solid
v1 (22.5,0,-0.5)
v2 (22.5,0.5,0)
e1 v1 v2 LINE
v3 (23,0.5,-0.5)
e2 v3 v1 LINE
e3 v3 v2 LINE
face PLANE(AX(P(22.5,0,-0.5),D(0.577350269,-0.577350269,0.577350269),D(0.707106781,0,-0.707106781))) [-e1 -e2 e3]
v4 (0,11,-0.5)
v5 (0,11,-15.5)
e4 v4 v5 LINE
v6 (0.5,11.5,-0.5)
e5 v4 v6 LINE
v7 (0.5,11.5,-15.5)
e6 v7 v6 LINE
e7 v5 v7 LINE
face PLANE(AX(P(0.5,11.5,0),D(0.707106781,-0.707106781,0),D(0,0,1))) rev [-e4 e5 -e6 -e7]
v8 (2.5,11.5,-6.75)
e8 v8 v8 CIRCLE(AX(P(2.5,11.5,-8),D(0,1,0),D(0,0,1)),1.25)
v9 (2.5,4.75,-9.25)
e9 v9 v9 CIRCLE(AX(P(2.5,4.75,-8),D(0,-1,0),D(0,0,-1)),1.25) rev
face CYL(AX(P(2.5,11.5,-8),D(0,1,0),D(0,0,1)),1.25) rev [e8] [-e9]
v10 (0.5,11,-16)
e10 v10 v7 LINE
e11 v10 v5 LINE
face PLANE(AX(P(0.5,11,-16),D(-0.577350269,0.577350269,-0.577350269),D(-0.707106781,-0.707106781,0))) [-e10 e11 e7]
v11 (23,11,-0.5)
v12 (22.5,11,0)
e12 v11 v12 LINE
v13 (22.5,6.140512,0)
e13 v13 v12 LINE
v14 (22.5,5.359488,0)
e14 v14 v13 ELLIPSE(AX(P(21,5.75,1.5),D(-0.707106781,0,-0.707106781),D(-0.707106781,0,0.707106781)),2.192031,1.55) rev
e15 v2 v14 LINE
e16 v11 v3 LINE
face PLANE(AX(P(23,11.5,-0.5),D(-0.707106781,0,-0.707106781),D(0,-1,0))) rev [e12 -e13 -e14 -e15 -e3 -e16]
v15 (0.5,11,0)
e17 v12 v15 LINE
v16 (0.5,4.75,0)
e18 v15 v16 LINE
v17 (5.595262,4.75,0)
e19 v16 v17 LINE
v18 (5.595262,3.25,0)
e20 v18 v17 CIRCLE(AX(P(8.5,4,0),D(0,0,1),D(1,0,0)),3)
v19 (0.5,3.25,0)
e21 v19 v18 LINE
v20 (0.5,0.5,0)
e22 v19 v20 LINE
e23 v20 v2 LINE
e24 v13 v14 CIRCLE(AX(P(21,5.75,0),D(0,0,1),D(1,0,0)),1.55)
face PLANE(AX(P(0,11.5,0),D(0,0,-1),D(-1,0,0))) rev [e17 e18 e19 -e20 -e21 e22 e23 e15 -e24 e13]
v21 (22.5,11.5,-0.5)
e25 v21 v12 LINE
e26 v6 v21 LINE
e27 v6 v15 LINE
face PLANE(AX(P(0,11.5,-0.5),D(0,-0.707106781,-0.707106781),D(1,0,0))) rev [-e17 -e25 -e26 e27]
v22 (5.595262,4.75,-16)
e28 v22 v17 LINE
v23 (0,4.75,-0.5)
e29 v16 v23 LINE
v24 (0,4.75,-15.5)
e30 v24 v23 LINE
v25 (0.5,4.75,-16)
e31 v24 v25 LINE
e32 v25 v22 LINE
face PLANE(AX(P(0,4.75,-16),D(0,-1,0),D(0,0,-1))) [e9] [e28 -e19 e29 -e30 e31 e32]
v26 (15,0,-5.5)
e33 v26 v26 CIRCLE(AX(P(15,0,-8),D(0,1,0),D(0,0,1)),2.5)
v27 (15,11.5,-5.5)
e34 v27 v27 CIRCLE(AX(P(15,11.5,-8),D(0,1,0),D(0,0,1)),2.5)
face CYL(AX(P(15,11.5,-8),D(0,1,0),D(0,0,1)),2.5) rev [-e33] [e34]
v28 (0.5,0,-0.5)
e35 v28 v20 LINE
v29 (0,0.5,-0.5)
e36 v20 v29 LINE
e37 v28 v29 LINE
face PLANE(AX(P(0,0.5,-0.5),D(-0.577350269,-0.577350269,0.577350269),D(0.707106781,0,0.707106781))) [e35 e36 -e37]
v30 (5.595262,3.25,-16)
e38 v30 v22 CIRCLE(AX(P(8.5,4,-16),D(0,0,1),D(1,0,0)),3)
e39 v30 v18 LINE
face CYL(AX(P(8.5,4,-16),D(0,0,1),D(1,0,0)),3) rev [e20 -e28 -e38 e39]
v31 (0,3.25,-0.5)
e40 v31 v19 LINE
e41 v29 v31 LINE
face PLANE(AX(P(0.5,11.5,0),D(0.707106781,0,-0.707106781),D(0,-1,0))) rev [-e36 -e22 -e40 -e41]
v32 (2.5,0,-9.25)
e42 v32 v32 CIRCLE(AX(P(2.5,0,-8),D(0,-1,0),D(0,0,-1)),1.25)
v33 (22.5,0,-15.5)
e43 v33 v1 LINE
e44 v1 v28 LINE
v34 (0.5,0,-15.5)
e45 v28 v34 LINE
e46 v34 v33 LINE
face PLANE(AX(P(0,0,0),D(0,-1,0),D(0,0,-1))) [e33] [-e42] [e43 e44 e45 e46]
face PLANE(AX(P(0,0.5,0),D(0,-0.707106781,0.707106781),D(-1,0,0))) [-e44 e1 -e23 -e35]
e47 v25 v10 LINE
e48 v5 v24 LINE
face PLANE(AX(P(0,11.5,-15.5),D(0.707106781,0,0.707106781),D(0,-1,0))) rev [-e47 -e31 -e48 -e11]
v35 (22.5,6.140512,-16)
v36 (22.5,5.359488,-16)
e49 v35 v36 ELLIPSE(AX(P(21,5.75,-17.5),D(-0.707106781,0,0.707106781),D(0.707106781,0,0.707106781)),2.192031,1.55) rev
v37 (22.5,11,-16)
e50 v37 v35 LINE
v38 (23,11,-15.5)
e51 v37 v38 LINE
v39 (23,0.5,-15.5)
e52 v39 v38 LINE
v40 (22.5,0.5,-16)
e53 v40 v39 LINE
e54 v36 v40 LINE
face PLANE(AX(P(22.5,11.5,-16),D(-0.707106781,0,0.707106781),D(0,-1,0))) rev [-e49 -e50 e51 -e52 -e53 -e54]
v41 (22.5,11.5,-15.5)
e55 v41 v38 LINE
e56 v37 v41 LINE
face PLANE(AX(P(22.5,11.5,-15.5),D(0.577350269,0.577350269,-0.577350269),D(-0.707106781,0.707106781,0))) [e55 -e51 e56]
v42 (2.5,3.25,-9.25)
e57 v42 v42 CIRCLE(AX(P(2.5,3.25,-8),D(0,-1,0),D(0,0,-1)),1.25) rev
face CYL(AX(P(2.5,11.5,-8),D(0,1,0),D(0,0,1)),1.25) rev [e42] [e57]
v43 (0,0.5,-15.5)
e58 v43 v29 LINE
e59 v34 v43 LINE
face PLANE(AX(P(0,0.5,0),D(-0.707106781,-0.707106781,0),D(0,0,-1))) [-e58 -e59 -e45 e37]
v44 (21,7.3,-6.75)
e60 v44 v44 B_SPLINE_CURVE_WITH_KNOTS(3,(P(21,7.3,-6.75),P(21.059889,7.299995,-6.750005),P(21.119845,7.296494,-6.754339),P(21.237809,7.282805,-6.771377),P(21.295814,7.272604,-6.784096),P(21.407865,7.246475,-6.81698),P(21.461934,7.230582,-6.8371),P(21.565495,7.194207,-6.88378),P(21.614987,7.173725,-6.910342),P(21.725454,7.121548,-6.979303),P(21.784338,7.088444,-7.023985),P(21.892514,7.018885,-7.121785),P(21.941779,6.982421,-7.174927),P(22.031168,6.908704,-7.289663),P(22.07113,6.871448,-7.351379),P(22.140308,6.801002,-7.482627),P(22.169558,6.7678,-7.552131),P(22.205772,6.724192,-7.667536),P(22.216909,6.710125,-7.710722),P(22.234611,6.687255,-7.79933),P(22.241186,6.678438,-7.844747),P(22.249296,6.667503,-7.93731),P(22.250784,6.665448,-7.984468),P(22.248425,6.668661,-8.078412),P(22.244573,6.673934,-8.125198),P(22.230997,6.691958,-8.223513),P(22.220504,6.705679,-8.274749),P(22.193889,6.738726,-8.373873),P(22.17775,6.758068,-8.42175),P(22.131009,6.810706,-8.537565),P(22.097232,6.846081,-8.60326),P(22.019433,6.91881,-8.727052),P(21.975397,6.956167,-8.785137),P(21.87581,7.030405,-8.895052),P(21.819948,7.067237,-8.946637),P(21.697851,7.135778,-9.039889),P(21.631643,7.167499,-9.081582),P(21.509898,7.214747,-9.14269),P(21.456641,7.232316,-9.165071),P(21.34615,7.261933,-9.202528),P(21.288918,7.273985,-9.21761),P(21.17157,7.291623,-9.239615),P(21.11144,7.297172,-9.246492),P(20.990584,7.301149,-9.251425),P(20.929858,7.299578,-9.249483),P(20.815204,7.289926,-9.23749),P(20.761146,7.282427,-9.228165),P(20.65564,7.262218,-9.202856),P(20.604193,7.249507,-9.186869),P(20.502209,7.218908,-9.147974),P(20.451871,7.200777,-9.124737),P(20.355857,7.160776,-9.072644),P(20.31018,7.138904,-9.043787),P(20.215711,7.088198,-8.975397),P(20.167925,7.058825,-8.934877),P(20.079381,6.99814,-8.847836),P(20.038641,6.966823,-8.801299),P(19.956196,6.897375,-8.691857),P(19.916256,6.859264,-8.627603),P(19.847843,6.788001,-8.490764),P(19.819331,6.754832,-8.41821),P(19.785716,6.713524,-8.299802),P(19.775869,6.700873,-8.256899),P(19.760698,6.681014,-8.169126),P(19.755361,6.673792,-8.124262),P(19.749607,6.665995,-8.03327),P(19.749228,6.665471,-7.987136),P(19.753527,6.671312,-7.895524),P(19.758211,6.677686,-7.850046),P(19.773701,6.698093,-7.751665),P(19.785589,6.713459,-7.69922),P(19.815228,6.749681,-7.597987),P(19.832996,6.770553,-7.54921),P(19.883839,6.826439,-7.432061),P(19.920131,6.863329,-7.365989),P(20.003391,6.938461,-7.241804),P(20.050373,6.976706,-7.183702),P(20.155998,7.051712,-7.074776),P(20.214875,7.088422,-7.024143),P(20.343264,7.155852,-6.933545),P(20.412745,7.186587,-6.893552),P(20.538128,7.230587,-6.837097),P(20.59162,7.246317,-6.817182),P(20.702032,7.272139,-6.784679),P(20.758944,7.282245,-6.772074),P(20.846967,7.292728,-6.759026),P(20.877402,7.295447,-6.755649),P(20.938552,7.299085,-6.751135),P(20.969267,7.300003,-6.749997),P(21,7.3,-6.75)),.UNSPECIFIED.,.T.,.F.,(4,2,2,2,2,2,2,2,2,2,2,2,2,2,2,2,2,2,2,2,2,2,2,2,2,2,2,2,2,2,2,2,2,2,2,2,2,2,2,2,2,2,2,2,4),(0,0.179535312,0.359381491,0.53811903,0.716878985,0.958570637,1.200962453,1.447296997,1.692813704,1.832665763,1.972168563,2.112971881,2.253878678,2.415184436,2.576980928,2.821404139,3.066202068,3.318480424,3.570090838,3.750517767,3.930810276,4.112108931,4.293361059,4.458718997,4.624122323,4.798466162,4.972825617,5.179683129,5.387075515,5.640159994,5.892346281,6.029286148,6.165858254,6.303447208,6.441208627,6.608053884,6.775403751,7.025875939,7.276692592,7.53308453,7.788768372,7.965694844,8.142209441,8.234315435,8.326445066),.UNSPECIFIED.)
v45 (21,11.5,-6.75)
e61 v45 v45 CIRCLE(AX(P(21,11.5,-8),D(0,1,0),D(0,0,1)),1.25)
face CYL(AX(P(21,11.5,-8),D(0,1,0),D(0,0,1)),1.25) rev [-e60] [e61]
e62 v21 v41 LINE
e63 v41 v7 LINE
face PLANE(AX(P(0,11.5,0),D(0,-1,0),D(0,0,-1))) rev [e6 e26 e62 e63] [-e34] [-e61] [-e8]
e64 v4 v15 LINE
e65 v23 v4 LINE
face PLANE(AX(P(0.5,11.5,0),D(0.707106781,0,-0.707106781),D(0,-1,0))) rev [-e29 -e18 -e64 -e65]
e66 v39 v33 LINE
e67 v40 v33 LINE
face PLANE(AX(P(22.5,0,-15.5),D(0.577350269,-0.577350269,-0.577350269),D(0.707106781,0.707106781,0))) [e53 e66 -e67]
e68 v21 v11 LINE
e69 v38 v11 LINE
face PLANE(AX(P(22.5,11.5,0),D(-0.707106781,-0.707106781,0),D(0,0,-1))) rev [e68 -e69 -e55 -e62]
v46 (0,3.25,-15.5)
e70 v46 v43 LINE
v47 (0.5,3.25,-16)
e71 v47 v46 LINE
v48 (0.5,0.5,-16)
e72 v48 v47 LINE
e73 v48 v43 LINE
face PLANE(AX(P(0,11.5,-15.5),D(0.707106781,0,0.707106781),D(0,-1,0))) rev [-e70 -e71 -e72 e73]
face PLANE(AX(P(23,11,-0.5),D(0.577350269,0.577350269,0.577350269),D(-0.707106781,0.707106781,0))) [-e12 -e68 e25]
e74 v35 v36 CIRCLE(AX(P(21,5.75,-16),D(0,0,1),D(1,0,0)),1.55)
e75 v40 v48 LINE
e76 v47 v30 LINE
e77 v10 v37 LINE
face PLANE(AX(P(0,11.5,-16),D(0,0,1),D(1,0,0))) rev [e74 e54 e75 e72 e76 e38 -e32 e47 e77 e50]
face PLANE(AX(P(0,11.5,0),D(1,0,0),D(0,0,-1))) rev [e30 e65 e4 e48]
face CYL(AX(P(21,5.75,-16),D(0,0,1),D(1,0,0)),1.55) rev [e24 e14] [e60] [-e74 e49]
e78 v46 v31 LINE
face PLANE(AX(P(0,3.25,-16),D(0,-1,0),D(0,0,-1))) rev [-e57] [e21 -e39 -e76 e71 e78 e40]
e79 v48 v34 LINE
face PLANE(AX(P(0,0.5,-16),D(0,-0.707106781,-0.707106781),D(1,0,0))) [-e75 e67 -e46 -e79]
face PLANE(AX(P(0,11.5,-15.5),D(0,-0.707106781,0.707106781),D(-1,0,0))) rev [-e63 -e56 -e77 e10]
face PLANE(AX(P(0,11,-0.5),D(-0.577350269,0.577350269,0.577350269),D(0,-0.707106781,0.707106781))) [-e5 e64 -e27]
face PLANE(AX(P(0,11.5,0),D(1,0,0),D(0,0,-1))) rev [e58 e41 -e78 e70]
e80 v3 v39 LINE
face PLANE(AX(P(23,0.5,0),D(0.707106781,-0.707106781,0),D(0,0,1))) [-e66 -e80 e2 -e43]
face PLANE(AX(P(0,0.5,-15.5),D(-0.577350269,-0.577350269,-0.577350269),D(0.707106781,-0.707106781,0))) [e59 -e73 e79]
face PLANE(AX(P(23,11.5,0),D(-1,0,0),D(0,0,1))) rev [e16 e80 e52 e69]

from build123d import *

# Parameters (mm, degrees)
SKETCH1_W                  = 23
SKETCH1_H                  = 16
BOSS_EXTRUDE1_DEPTH        = 11.5
SKETCH10_R                 = 1.55
CUT_EXTRUDE2_DEPTH         = 31.286135442
M3X0_5_TAPPED_HOLE1_REACH  = 32.286
M3X0_5_TAPPED_HOLE1_BORE_R = 1.25
M6_TAPPED_HOLE1_D          = 5
CUT_EXTRUDE1_DEPTH         = 16


with BuildPart() as part:
    # Sketch1 → Boss-Extrude1 (new body)
    with BuildSketch(Plane(origin=(0, 0, 0), x_dir=(1, 0, 0), z_dir=(0, 1, 0))):
        with Locations((11.5, 8)):
            Rectangle(SKETCH1_W, SKETCH1_H)
    extrude(amount=BOSS_EXTRUDE1_DEPTH)

    # Sketch10 → Cut-Extrude2 (cut, through all)
    with BuildSketch(Plane.XY):
        with Locations((21, 5.75)):
            Circle(SKETCH10_R)
    extrude(amount=-CUT_EXTRUDE2_DEPTH, mode=Mode.SUBTRACT)

    # M3x0.5 Tapped Hole1 bore → M3x0.5 Tapped Hole1 (cut, up to next)
    with BuildSketch(Plane(origin=(0, 11.5, 0), x_dir=(1, 0, 0), z_dir=(0, 1, 0)), mode=Mode.PRIVATE) as m3x0_5_tapped_hole1_sk1:
        with Locations((2.5, 8)):
            Circle(M3X0_5_TAPPED_HOLE1_BORE_R)
    m3x0_5_tapped_hole1_tool1 = extrude(m3x0_5_tapped_hole1_sk1.sketch, amount=-M3X0_5_TAPPED_HOLE1_REACH, mode=Mode.PRIVATE) & part.part
    # M3x0.5 Tapped Hole1 bore → M3x0.5 Tapped Hole1 (cut, up to next)
    with BuildSketch(Plane(origin=(0, 11.5, 0), x_dir=(1, 0, 0), z_dir=(0, 1, 0)), mode=Mode.PRIVATE) as m3x0_5_tapped_hole1_sk2:
        with Locations((21, 8)):
            Circle(M3X0_5_TAPPED_HOLE1_BORE_R)
    m3x0_5_tapped_hole1_tool2 = extrude(m3x0_5_tapped_hole1_sk2.sketch, amount=-M3X0_5_TAPPED_HOLE1_REACH, mode=Mode.PRIVATE) & part.part
    add(m3x0_5_tapped_hole1_tool1.solids().sort_by_distance((2.5, 11.5, -8))[0], mode=Mode.SUBTRACT)
    add(m3x0_5_tapped_hole1_tool2.solids().sort_by_distance((21, 11.5, -8))[0], mode=Mode.SUBTRACT)

    # M6 Tapped Hole1 (through all)
    with Locations(Plane(origin=(0, 11.5, 0), x_dir=(1, 0, 0), z_dir=(0, 1, 0))):
        with Locations((15, 8)):
            Hole(M6_TAPPED_HOLE1_D / 2)

    # Sketch2 → Cut-Extrude1 (cut)
    with BuildSketch(Plane.XY):
        with BuildLine():
            Line((5.59526249, 4.75), (0, 4.75))
            Line((0, 4.75), (0, 3.25))
            Line((0, 3.25), (5.59526249, 3.25))
            ThreePointArc((5.59526249, 3.25), (5.5, 4), (5.59526249, 4.75))
        make_face()
        with BuildLine():
            ThreePointArc((11.5, 4), (8.878012877, 6.976089089), (5.59526249, 4.75))
            Line((5.59526249, 4.75), (5.59526249, 3.25))
            ThreePointArc((5.59526249, 3.25), (8.878012877, 1.023910911), (11.5, 4))
        make_face()
        with BuildLine():
            Line((5.59526249, 3.25), (5.59526249, 4.75))
            ThreePointArc((5.59526249, 4.75), (5.5, 4), (5.59526249, 3.25))
        make_face()
    extrude(amount=-CUT_EXTRUDE1_DEPTH, mode=Mode.SUBTRACT)

    # Chamfer1
    # the kernel refuses this chamfer: 0.5 mm, written as the material it takes off along each edge
    with BuildSketch(Plane(origin=(22.666666667, 11.166666667, -0.333333333), x_dir=(0.7071067811865475, 0, -0.7071067811865475), z_dir=(0.5773502691896258, 0.5773502691896258, 0.5773502691896258)), Plane(origin=(0.333333333, 0.333333333, -0.333333333), x_dir=(-0.7071067811865475, 0, -0.7071067811865475), z_dir=(-0.5773502691896257, -0.5773502691896257, 0.5773502691896257)), Plane(origin=(0.333333333, 11.166666667, -0.333333333), x_dir=(0, 0.7071067811865476, -0.7071067811865475), z_dir=(-0.5773502691896258, 0.5773502691896257, 0.5773502691896258)), Plane(origin=(22.666666667, 0.333333333, -15.666666667), x_dir=(0, 0.7071067811865475, -0.7071067811865475), z_dir=(0.5773502691896258, -0.5773502691896258, -0.5773502691896258)), Plane(origin=(22.666666667, 0.333333333, -0.333333333), x_dir=(0, -0.7071067811865475, -0.7071067811865475), z_dir=(0.5773502691896258, -0.5773502691896258, 0.5773502691896258))) as chamfer1_piece_1:
        Polygon((-0.353553391, -0.204124145), (0.353553391, -0.204124145), (0, 0.40824829), align=None)
    extrude(amount=0.635085296, mode=Mode.SUBTRACT)
    with BuildSketch(Plane(origin=(22.666666667, 11.166666667, -15.666666667), x_dir=(0.7071067811865475, 0, 0.7071067811865475), z_dir=(0.5773502691896258, 0.5773502691896258, -0.5773502691896258)), Plane(origin=(0.333333333, 11.166666667, -15.666666667), x_dir=(0, 0.7071067811865475, 0.7071067811865475), z_dir=(-0.5773502691896258, 0.5773502691896257, -0.5773502691896258)), Plane(origin=(0.333333333, 0.333333333, -15.666666667), x_dir=(0.7071067811865475, -0.7071067811865475, 0), z_dir=(-0.5773502691896257, -0.5773502691896257, -0.5773502691896258))) as chamfer1_piece_2:
        Polygon((-0.353553391, 0.204124145), (0.353553391, 0.204124145), (0, -0.40824829), align=None)
    extrude(amount=0.635085296, mode=Mode.SUBTRACT)
    with BuildSketch(Plane(origin=(23, 11.5, 1.285841494), x_dir=(0.0274958766105891, -0.9996219169112968, 0), z_dir=(0, 0, -1)), Plane(origin=(23, 0, 1.285841494), x_dir=(-0.9996219169112968, -0.027495876610586292, 0), z_dir=(0, 0, -1)), Plane(origin=(0, 0, -17.285841494), x_dir=(0.9996219169112968, -0.027495876610586372, 0), z_dir=(0, 0, 1))) as chamfer1_piece_3:
        with BuildLine():
            Line((0.514336598, 0), (-0.028273577, 0.513558897))
            Line((-0.028273577, 0.513558897), (-0.038269797, 0.513283938))
            ThreePointArc((-0.038269797, 0.513283938), (-0.017064614, 0.256698915), (-0.009996219, -0.000274959))
            Line((-0.009996219, -0.000274959), (0.000274959, -0.009996219))
            ThreePointArc((0.000274959, -0.009996219), (0.257248832, -0.002927825), (0.514611556, -0.009996219))
            Line((0.514611556, -0.009996219), (0.514336598, 0))
        make_face()
    extrude(amount=18.571682988, mode=Mode.SUBTRACT)
    with BuildSketch(Plane(origin=(24.285841494, 11.5, -16), x_dir=(0, 0.027495876610585647, 0.9996219169112968), z_dir=(-1, 0, 0)), Plane(origin=(-1.285841494, 0, 0), x_dir=(0, 0.9996219169112968, 0.027495876610586372), z_dir=(1, 0, 0))) as chamfer1_piece_4:
        with BuildLine():
            Line((0.514336598, 0), (-0.028273577, -0.513558897))
            Line((-0.028273577, -0.513558897), (-0.038269797, -0.513283938))
            ThreePointArc((-0.038269797, -0.513283938), (-0.017064614, -0.256698915), (-0.009996219, 0.000274959))
            Line((-0.009996219, 0.000274959), (0.000274959, 0.009996219))
            ThreePointArc((0.000274959, 0.009996219), (0.257248832, 0.002927825), (0.514611556, 0.009996219))
            Line((0.514611556, 0.009996219), (0.514336598, 0))
        make_face()
    extrude(amount=25.571682988, mode=Mode.SUBTRACT)
    with BuildSketch(Plane(origin=(0, -1.285841494, -16), x_dir=(-0.02749587661058639, 0, 0.9996219169112968), z_dir=(0, 1, 0)), Plane(origin=(0, -1.285841494, 0), x_dir=(0.9996219169112968, 0, 0.027495876610586372), z_dir=(0, 1, 0))) as chamfer1_piece_5:
        with BuildLine():
            Line((0.514336598, 0), (-0.028273577, 0.513558897))
            Line((-0.028273577, 0.513558897), (-0.038269797, 0.513283938))
            ThreePointArc((-0.038269797, 0.513283938), (-0.017064614, 0.256698915), (-0.009996219, -0.000274959))
            Line((-0.009996219, -0.000274959), (0.000274959, -0.009996219))
            ThreePointArc((0.000274959, -0.009996219), (0.257248832, -0.002927825), (0.514611556, -0.009996219))
            Line((0.514611556, -0.009996219), (0.514336598, 0))
        make_face()
    extrude(amount=5.821682988, mode=Mode.SUBTRACT)
    with BuildSketch(Plane(origin=(0, 11.5, -17.285841494), x_dir=(0.9996219169112968, 0.02749587661058563, 0), z_dir=(0, 0, 1))) as chamfer1_piece_6:
        with BuildLine():
            Line((0.514336598, 0), (-0.028273577, -0.513558897))
            Line((-0.028273577, -0.513558897), (-0.038269797, -0.513283938))
            ThreePointArc((-0.038269797, -0.513283938), (-0.017064614, -0.256698915), (-0.009996219, 0.000274959))
            Line((-0.009996219, 0.000274959), (0.000274959, 0.009996219))
            ThreePointArc((0.000274959, 0.009996219), (0.257248832, 0.002927825), (0.514611556, 0.009996219))
            Line((0.514611556, 0.009996219), (0.514336598, 0))
        make_face()
    extrude(amount=18.571682988, mode=Mode.SUBTRACT)
    with BuildSketch(Plane(origin=(24.285841494, 0, -16), x_dir=(0, -0.02749587661058639, 0.9996219169112968), z_dir=(-1, 0, 0)), Plane(origin=(-1.285841494, 11.5, 0), x_dir=(0, -0.9996219169112968, 0.02749587661058639), z_dir=(1, 0, 0))) as chamfer1_piece_7:
        with BuildLine():
            Line((0.514336598, 0), (-0.028273577, 0.513558897))
            Line((-0.028273577, 0.513558897), (-0.038269797, 0.513283938))
            ThreePointArc((-0.038269797, 0.513283938), (-0.017064614, 0.256698915), (-0.009996219, -0.000274959))
            Line((-0.009996219, -0.000274959), (0.000274959, -0.009996219))
            ThreePointArc((0.000274959, -0.009996219), (0.257248832, -0.002927825), (0.514611556, -0.009996219))
            Line((0.514611556, -0.009996219), (0.514336598, 0))
        make_face()
    extrude(amount=25.571682988, mode=Mode.SUBTRACT)
    with BuildSketch(Plane(origin=(0, 3.464158506, -16), x_dir=(-0.02749587661058639, 0, 0.9996219169112968), z_dir=(0, 1, 0)), Plane(origin=(0, 3.464158506, 0), x_dir=(0.9996219169112968, 0, 0.027495876610586372), z_dir=(0, 1, 0))) as chamfer1_piece_8:
        with BuildLine():
            Line((0.514336598, 0), (-0.028273577, 0.513558897))
            Line((-0.028273577, 0.513558897), (-0.038269797, 0.513283938))
            ThreePointArc((-0.038269797, 0.513283938), (-0.017064614, 0.256698915), (-0.009996219, -0.000274959))
            Line((-0.009996219, -0.000274959), (0.000274959, -0.009996219))
            ThreePointArc((0.000274959, -0.009996219), (0.257248832, -0.002927825), (0.514611556, -0.009996219))
            Line((0.514611556, -0.009996219), (0.514336598, 0))
        make_face()
    extrude(amount=9.321682988, mode=Mode.SUBTRACT)
    with BuildSketch(Plane(origin=(23, -1.285841494, -16), x_dir=(0.0274958766105891, 0, 0.9996219169112968), z_dir=(0, 1, 0)), Plane(origin=(23, -1.285841494, 0), x_dir=(-0.9996219169112968, 0, 0.027495876610586292), z_dir=(0, 1, 0))) as chamfer1_piece_9:
        with BuildLine():
            Line((0.514336598, 0), (-0.028273577, -0.513558897))
            Line((-0.028273577, -0.513558897), (-0.038269797, -0.513283938))
            ThreePointArc((-0.038269797, -0.513283938), (-0.017064614, -0.256698915), (-0.009996219, 0.000274959))
            Line((-0.009996219, 0.000274959), (0.000274959, 0.009996219))
            ThreePointArc((0.000274959, 0.009996219), (0.257248832, 0.002927825), (0.514611556, 0.009996219))
            Line((0.514611556, 0.009996219), (0.514336598, 0))
        make_face()
    extrude(amount=14.071682988, mode=Mode.SUBTRACT)


solid = part.part
